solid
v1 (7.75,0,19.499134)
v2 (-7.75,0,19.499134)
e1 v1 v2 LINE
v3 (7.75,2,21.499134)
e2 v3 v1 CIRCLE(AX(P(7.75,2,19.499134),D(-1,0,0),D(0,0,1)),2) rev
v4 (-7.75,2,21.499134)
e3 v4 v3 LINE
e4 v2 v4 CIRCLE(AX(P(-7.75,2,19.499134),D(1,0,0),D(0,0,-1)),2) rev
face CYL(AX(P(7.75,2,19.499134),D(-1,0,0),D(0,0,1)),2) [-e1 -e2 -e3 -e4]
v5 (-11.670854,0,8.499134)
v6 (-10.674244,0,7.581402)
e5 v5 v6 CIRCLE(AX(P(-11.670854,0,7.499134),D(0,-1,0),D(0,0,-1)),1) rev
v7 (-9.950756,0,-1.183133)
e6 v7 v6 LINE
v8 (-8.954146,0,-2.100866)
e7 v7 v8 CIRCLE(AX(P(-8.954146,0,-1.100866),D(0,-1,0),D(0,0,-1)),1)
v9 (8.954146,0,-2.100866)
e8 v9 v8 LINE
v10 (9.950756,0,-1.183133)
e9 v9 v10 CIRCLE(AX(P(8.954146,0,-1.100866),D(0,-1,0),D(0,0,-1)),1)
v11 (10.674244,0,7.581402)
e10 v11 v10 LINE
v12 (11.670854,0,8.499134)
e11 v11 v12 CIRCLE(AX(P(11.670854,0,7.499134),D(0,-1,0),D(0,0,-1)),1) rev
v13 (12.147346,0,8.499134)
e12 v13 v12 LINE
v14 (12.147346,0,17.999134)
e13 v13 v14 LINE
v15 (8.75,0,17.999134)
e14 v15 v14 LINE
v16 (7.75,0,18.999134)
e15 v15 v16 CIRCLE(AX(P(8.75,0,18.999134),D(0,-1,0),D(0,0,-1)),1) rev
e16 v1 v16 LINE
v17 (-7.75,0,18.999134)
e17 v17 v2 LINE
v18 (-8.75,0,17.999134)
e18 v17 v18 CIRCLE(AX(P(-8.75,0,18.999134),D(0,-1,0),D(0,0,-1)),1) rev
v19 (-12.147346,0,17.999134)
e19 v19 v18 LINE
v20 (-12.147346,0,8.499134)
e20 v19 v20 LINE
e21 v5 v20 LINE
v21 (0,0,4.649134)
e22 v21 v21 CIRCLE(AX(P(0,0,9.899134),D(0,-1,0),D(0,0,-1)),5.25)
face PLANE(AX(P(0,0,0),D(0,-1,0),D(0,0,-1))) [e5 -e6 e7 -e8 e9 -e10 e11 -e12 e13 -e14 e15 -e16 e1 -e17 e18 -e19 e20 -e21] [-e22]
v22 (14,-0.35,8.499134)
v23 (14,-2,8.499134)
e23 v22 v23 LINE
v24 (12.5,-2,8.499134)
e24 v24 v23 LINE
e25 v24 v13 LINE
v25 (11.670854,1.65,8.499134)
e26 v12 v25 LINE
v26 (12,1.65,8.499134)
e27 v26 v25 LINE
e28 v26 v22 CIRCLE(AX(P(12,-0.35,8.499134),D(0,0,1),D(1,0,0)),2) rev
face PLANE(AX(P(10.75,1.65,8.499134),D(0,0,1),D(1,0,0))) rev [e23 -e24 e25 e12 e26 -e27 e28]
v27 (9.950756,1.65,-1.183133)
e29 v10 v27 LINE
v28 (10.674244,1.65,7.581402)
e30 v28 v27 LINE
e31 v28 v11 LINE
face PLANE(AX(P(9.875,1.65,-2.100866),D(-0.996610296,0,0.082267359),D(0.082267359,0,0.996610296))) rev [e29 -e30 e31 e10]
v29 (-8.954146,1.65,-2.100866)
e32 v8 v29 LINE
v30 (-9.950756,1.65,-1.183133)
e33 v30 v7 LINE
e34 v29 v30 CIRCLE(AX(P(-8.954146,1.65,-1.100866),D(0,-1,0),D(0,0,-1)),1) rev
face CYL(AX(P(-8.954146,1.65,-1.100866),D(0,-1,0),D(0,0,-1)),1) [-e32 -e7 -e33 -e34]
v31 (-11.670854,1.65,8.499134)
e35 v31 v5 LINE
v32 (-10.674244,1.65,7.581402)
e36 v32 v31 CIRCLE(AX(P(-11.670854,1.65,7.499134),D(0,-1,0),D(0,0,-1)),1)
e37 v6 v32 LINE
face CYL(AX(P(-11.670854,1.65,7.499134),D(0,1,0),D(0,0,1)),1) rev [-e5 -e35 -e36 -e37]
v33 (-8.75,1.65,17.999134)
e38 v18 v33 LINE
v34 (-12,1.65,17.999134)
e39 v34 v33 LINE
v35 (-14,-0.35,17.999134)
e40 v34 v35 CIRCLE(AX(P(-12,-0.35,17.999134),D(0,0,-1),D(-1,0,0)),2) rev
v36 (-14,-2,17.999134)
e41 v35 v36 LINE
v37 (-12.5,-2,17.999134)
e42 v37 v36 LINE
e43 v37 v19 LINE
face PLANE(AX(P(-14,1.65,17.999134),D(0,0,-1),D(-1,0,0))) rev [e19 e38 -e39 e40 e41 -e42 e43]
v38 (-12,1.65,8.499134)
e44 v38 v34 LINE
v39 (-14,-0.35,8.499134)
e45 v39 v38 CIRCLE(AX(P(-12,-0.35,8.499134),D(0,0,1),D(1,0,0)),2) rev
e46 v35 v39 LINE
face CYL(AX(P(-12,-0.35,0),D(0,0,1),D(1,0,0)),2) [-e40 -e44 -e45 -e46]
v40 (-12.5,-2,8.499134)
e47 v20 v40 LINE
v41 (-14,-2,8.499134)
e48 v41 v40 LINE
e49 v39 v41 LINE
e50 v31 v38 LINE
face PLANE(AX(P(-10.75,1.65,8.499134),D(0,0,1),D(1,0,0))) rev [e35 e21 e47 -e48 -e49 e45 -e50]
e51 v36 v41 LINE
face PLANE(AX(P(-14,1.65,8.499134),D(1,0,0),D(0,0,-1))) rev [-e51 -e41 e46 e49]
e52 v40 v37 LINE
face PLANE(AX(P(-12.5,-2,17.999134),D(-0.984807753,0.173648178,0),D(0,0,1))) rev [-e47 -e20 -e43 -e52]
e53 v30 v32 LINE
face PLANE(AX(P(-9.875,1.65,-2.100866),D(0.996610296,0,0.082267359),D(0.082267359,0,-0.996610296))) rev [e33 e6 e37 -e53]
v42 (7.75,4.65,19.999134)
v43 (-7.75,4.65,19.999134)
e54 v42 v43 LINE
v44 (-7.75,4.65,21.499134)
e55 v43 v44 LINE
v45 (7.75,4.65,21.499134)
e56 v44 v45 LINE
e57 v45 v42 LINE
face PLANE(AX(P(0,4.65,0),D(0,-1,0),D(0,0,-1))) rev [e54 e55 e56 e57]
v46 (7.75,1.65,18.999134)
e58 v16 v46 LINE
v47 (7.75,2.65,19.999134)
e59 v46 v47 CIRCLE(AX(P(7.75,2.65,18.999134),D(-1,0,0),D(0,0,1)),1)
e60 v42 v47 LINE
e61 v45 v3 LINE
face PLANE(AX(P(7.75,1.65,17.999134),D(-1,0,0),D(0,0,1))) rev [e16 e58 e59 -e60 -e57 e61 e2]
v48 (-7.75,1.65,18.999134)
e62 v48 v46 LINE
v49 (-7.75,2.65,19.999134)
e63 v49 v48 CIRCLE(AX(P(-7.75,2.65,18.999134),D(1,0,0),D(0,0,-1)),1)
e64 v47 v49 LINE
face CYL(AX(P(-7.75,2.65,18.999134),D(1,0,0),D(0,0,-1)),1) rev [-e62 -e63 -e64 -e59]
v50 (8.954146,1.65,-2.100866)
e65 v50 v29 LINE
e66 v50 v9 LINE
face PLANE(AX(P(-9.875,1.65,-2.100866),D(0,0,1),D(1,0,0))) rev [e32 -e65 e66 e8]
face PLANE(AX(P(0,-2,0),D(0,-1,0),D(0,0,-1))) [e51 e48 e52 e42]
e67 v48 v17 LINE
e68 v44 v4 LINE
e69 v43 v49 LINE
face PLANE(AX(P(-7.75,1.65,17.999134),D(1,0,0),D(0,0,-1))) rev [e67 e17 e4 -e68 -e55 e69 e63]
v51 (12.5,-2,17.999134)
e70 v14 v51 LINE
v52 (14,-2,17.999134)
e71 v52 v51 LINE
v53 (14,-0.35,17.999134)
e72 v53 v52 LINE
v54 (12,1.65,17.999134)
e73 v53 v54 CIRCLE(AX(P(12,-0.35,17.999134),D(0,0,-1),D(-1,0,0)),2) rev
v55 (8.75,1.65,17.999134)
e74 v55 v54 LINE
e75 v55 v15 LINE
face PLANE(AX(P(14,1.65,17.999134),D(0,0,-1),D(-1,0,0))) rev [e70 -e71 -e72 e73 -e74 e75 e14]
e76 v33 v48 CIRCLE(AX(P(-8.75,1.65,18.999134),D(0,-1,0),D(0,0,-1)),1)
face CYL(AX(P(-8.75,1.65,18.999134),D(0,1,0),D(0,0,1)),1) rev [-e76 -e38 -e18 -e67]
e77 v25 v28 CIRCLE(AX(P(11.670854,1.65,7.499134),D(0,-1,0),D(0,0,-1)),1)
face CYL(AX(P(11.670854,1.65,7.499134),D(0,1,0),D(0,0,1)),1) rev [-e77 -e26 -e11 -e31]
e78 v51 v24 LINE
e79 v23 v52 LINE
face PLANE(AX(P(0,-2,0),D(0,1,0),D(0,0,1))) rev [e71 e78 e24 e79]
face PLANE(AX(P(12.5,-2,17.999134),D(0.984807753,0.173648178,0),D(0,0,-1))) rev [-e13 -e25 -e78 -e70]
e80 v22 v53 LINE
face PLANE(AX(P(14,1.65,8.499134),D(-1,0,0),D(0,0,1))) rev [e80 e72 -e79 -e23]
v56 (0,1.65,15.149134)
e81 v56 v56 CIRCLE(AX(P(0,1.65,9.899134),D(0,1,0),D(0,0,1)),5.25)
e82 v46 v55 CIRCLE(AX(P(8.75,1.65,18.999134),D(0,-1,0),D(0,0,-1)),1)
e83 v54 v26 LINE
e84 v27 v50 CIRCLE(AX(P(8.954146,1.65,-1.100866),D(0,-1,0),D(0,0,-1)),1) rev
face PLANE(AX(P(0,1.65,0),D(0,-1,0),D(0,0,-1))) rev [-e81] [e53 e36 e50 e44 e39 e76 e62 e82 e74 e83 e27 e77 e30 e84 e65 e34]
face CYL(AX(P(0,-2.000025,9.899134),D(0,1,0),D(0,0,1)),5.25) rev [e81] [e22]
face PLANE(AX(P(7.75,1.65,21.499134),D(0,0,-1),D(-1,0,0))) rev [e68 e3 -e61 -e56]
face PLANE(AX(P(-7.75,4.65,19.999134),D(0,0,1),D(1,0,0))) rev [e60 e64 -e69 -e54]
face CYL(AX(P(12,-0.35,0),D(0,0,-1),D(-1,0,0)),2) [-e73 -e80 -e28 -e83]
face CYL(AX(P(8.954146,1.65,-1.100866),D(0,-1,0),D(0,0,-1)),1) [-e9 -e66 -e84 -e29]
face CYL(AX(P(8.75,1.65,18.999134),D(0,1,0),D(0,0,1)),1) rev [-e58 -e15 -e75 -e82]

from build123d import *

# Parameters (mm, degrees)
RESSALTO_EXTRUS_O1_DEPTH = 1.65
ESBO_O2_W                = 15.5
ESBO_O2_H                = 1.5
RESSALTO_EXTRUS_O2_DEPTH = 3
ESBO_O3_W                = 1.5
ESBO_O3_H                = 9.5
RESSALTO_EXTRUS_O3_DEPTH = 2
ESBO_O4_R                = 5.25
CORTE_EXTRUS_O1_DEPTH    = 26.913997794
FILETE1_R                = 2
CHANFRO1_SIZE            = 0.352653961
CHANFRO1_SIZE_2          = 2
FILETE3_R                = 2
FILETE4_R                = 1
FILETE5_R                = 1
FILETE6_R                = 1
FILETE7_R                = 1


with BuildPart() as part:
    # Esboço1 → Ressalto-extrusão1 (new body)
    with BuildSketch(Plane(origin=(0, 0, 0), x_dir=(1, 0, 0), z_dir=(0, 1, 0))):
        Polygon((-9.875, 2.10086556), (9.875, 2.10086556), (10.75, -8.49913444), (14, -8.49913444), (14, -17.99913444), (7.75, -17.99913444), (7.75, -21.49913444), (-7.75, -21.49913444), (-7.75, -17.99913444), (-14, -17.99913444), (-14, -8.49913444), (-10.75, -8.49913444), align=None)
    extrude(amount=RESSALTO_EXTRUS_O1_DEPTH)

    # Esboço2 → Ressalto-extrusão2 (add)
    with BuildSketch(Plane(origin=(0, 1.65, 0), x_dir=(1, 0, 0), z_dir=(0, 1, 0))):
        with Locations((0, -20.74913444)):
            Rectangle(ESBO_O2_W, ESBO_O2_H)
    extrude(amount=RESSALTO_EXTRUS_O2_DEPTH)

    # Esboço3 → Ressalto-extrusão3 (add)
    with BuildSketch(Plane.XZ):
        with Locations((-13.25, 13.24913444)):
            Rectangle(ESBO_O3_W, ESBO_O3_H)
        with Locations((13.25, 13.24913444)):
            Rectangle(ESBO_O3_W, ESBO_O3_H)
    extrude(amount=RESSALTO_EXTRUS_O3_DEPTH)

    # Esboço4 → Corte-extrusão1 (cut, through all)
    with BuildSketch(Plane(origin=(0, 1.65, 0), x_dir=(1, 0, 0), z_dir=(0, 1, 0))):
        with Locations(Location((0, -9.89913444, 0), (0, 0, 270))):
            Circle(ESBO_O4_R)
    extrude(amount=-CORTE_EXTRUS_O1_DEPTH, mode=Mode.SUBTRACT)

    # Filete1
    filete1_edges = [part.edges().sort_by_distance(p)[0] for p in [
        (14, 1.65, 13.24913444),
        (-14, 1.65, 13.24913444),
    ]]
    fillet(filete1_edges, radius=FILETE1_R)

    # Chanfro1
    # the kernel refuses this chamfer: 2, 0.352653961 mm, written as the material it adds along each edge
    with BuildSketch(Plane(origin=(12.5, 0, 17.99913444), x_dir=(-0.9776715712462587, 0.21013876076743104, 0), z_dir=(0, 0, -1))) as chanfro1_piece_1_section:
        Polygon((CHANFRO1_SIZE * 0.977671572402, -CHANFRO1_SIZE * 0.210138761016), (-CHANFRO1_SIZE_2 * 0.210138760767, -CHANFRO1_SIZE_2 * 0.977671571246), (0, 0), align=None)
    chanfro1_piece_1 = extrude(amount=9.5, mode=Mode.PRIVATE)
    chanfro1_piece_1 = split(chanfro1_piece_1, bisect_by=Plane(origin=(12.403792596, -2, 13.24913444), z_dir=(0, 1, 0)), keep=Keep.TOP, mode=Mode.PRIVATE)
    add(chanfro1_piece_1)
    with BuildSketch(Plane(origin=(-12.5, 0, 17.99913444), x_dir=(0.9776715712462587, 0.21013876076743104, 0), z_dir=(0, 0, -1))) as chanfro1_piece_2_section:
        Polygon((CHANFRO1_SIZE * 0.977671572402, CHANFRO1_SIZE * 0.210138761016), (-CHANFRO1_SIZE_2 * 0.210138760767, CHANFRO1_SIZE_2 * 0.977671571246), (0, 0), align=None)
    chanfro1_piece_2 = extrude(amount=9.5, mode=Mode.PRIVATE)
    chanfro1_piece_2 = split(chanfro1_piece_2, bisect_by=Plane(origin=(-12.403792596, -2, 13.24913444), z_dir=(0, 1, 0)), keep=Keep.TOP, mode=Mode.PRIVATE)
    add(chanfro1_piece_2)

    # Filete3
    filete3_edges = [part.edges().sort_by_distance(p)[0] for p in [
        (0, 0, 21.49913444),
    ]]
    fillet(filete3_edges, radius=FILETE3_R)

    # Filete4
    filete4_edges = [part.edges().sort_by_distance(p)[0] for p in [
        (0, 1.65, 19.99913444),
    ]]
    fillet(filete4_edges, radius=FILETE4_R)

    # Filete5
    filete5_edges = [part.edges().sort_by_distance(p)[0] for p in [
        (-9.875, 0.825, -2.10086556),
    ]]
    fillet(filete5_edges, radius=FILETE5_R)

    # Filete6
    filete6_edges = [part.edges().sort_by_distance(p)[0] for p in [
        (9.875, 0.825, -2.10086556),
    ]]
    fillet(filete6_edges, radius=FILETE6_R)

    # Filete7
    filete7_edges = [part.edges().sort_by_distance(p)[0] for p in [
        (-10.75, 0.825, 8.49913444),
        (-7.75, 0.825, 17.99913444),
        (7.75, 0.825, 17.99913444),
        (10.75, 0.825, 8.49913444),
    ]]
    fillet(filete7_edges, radius=FILETE7_R)


solid = part.part
